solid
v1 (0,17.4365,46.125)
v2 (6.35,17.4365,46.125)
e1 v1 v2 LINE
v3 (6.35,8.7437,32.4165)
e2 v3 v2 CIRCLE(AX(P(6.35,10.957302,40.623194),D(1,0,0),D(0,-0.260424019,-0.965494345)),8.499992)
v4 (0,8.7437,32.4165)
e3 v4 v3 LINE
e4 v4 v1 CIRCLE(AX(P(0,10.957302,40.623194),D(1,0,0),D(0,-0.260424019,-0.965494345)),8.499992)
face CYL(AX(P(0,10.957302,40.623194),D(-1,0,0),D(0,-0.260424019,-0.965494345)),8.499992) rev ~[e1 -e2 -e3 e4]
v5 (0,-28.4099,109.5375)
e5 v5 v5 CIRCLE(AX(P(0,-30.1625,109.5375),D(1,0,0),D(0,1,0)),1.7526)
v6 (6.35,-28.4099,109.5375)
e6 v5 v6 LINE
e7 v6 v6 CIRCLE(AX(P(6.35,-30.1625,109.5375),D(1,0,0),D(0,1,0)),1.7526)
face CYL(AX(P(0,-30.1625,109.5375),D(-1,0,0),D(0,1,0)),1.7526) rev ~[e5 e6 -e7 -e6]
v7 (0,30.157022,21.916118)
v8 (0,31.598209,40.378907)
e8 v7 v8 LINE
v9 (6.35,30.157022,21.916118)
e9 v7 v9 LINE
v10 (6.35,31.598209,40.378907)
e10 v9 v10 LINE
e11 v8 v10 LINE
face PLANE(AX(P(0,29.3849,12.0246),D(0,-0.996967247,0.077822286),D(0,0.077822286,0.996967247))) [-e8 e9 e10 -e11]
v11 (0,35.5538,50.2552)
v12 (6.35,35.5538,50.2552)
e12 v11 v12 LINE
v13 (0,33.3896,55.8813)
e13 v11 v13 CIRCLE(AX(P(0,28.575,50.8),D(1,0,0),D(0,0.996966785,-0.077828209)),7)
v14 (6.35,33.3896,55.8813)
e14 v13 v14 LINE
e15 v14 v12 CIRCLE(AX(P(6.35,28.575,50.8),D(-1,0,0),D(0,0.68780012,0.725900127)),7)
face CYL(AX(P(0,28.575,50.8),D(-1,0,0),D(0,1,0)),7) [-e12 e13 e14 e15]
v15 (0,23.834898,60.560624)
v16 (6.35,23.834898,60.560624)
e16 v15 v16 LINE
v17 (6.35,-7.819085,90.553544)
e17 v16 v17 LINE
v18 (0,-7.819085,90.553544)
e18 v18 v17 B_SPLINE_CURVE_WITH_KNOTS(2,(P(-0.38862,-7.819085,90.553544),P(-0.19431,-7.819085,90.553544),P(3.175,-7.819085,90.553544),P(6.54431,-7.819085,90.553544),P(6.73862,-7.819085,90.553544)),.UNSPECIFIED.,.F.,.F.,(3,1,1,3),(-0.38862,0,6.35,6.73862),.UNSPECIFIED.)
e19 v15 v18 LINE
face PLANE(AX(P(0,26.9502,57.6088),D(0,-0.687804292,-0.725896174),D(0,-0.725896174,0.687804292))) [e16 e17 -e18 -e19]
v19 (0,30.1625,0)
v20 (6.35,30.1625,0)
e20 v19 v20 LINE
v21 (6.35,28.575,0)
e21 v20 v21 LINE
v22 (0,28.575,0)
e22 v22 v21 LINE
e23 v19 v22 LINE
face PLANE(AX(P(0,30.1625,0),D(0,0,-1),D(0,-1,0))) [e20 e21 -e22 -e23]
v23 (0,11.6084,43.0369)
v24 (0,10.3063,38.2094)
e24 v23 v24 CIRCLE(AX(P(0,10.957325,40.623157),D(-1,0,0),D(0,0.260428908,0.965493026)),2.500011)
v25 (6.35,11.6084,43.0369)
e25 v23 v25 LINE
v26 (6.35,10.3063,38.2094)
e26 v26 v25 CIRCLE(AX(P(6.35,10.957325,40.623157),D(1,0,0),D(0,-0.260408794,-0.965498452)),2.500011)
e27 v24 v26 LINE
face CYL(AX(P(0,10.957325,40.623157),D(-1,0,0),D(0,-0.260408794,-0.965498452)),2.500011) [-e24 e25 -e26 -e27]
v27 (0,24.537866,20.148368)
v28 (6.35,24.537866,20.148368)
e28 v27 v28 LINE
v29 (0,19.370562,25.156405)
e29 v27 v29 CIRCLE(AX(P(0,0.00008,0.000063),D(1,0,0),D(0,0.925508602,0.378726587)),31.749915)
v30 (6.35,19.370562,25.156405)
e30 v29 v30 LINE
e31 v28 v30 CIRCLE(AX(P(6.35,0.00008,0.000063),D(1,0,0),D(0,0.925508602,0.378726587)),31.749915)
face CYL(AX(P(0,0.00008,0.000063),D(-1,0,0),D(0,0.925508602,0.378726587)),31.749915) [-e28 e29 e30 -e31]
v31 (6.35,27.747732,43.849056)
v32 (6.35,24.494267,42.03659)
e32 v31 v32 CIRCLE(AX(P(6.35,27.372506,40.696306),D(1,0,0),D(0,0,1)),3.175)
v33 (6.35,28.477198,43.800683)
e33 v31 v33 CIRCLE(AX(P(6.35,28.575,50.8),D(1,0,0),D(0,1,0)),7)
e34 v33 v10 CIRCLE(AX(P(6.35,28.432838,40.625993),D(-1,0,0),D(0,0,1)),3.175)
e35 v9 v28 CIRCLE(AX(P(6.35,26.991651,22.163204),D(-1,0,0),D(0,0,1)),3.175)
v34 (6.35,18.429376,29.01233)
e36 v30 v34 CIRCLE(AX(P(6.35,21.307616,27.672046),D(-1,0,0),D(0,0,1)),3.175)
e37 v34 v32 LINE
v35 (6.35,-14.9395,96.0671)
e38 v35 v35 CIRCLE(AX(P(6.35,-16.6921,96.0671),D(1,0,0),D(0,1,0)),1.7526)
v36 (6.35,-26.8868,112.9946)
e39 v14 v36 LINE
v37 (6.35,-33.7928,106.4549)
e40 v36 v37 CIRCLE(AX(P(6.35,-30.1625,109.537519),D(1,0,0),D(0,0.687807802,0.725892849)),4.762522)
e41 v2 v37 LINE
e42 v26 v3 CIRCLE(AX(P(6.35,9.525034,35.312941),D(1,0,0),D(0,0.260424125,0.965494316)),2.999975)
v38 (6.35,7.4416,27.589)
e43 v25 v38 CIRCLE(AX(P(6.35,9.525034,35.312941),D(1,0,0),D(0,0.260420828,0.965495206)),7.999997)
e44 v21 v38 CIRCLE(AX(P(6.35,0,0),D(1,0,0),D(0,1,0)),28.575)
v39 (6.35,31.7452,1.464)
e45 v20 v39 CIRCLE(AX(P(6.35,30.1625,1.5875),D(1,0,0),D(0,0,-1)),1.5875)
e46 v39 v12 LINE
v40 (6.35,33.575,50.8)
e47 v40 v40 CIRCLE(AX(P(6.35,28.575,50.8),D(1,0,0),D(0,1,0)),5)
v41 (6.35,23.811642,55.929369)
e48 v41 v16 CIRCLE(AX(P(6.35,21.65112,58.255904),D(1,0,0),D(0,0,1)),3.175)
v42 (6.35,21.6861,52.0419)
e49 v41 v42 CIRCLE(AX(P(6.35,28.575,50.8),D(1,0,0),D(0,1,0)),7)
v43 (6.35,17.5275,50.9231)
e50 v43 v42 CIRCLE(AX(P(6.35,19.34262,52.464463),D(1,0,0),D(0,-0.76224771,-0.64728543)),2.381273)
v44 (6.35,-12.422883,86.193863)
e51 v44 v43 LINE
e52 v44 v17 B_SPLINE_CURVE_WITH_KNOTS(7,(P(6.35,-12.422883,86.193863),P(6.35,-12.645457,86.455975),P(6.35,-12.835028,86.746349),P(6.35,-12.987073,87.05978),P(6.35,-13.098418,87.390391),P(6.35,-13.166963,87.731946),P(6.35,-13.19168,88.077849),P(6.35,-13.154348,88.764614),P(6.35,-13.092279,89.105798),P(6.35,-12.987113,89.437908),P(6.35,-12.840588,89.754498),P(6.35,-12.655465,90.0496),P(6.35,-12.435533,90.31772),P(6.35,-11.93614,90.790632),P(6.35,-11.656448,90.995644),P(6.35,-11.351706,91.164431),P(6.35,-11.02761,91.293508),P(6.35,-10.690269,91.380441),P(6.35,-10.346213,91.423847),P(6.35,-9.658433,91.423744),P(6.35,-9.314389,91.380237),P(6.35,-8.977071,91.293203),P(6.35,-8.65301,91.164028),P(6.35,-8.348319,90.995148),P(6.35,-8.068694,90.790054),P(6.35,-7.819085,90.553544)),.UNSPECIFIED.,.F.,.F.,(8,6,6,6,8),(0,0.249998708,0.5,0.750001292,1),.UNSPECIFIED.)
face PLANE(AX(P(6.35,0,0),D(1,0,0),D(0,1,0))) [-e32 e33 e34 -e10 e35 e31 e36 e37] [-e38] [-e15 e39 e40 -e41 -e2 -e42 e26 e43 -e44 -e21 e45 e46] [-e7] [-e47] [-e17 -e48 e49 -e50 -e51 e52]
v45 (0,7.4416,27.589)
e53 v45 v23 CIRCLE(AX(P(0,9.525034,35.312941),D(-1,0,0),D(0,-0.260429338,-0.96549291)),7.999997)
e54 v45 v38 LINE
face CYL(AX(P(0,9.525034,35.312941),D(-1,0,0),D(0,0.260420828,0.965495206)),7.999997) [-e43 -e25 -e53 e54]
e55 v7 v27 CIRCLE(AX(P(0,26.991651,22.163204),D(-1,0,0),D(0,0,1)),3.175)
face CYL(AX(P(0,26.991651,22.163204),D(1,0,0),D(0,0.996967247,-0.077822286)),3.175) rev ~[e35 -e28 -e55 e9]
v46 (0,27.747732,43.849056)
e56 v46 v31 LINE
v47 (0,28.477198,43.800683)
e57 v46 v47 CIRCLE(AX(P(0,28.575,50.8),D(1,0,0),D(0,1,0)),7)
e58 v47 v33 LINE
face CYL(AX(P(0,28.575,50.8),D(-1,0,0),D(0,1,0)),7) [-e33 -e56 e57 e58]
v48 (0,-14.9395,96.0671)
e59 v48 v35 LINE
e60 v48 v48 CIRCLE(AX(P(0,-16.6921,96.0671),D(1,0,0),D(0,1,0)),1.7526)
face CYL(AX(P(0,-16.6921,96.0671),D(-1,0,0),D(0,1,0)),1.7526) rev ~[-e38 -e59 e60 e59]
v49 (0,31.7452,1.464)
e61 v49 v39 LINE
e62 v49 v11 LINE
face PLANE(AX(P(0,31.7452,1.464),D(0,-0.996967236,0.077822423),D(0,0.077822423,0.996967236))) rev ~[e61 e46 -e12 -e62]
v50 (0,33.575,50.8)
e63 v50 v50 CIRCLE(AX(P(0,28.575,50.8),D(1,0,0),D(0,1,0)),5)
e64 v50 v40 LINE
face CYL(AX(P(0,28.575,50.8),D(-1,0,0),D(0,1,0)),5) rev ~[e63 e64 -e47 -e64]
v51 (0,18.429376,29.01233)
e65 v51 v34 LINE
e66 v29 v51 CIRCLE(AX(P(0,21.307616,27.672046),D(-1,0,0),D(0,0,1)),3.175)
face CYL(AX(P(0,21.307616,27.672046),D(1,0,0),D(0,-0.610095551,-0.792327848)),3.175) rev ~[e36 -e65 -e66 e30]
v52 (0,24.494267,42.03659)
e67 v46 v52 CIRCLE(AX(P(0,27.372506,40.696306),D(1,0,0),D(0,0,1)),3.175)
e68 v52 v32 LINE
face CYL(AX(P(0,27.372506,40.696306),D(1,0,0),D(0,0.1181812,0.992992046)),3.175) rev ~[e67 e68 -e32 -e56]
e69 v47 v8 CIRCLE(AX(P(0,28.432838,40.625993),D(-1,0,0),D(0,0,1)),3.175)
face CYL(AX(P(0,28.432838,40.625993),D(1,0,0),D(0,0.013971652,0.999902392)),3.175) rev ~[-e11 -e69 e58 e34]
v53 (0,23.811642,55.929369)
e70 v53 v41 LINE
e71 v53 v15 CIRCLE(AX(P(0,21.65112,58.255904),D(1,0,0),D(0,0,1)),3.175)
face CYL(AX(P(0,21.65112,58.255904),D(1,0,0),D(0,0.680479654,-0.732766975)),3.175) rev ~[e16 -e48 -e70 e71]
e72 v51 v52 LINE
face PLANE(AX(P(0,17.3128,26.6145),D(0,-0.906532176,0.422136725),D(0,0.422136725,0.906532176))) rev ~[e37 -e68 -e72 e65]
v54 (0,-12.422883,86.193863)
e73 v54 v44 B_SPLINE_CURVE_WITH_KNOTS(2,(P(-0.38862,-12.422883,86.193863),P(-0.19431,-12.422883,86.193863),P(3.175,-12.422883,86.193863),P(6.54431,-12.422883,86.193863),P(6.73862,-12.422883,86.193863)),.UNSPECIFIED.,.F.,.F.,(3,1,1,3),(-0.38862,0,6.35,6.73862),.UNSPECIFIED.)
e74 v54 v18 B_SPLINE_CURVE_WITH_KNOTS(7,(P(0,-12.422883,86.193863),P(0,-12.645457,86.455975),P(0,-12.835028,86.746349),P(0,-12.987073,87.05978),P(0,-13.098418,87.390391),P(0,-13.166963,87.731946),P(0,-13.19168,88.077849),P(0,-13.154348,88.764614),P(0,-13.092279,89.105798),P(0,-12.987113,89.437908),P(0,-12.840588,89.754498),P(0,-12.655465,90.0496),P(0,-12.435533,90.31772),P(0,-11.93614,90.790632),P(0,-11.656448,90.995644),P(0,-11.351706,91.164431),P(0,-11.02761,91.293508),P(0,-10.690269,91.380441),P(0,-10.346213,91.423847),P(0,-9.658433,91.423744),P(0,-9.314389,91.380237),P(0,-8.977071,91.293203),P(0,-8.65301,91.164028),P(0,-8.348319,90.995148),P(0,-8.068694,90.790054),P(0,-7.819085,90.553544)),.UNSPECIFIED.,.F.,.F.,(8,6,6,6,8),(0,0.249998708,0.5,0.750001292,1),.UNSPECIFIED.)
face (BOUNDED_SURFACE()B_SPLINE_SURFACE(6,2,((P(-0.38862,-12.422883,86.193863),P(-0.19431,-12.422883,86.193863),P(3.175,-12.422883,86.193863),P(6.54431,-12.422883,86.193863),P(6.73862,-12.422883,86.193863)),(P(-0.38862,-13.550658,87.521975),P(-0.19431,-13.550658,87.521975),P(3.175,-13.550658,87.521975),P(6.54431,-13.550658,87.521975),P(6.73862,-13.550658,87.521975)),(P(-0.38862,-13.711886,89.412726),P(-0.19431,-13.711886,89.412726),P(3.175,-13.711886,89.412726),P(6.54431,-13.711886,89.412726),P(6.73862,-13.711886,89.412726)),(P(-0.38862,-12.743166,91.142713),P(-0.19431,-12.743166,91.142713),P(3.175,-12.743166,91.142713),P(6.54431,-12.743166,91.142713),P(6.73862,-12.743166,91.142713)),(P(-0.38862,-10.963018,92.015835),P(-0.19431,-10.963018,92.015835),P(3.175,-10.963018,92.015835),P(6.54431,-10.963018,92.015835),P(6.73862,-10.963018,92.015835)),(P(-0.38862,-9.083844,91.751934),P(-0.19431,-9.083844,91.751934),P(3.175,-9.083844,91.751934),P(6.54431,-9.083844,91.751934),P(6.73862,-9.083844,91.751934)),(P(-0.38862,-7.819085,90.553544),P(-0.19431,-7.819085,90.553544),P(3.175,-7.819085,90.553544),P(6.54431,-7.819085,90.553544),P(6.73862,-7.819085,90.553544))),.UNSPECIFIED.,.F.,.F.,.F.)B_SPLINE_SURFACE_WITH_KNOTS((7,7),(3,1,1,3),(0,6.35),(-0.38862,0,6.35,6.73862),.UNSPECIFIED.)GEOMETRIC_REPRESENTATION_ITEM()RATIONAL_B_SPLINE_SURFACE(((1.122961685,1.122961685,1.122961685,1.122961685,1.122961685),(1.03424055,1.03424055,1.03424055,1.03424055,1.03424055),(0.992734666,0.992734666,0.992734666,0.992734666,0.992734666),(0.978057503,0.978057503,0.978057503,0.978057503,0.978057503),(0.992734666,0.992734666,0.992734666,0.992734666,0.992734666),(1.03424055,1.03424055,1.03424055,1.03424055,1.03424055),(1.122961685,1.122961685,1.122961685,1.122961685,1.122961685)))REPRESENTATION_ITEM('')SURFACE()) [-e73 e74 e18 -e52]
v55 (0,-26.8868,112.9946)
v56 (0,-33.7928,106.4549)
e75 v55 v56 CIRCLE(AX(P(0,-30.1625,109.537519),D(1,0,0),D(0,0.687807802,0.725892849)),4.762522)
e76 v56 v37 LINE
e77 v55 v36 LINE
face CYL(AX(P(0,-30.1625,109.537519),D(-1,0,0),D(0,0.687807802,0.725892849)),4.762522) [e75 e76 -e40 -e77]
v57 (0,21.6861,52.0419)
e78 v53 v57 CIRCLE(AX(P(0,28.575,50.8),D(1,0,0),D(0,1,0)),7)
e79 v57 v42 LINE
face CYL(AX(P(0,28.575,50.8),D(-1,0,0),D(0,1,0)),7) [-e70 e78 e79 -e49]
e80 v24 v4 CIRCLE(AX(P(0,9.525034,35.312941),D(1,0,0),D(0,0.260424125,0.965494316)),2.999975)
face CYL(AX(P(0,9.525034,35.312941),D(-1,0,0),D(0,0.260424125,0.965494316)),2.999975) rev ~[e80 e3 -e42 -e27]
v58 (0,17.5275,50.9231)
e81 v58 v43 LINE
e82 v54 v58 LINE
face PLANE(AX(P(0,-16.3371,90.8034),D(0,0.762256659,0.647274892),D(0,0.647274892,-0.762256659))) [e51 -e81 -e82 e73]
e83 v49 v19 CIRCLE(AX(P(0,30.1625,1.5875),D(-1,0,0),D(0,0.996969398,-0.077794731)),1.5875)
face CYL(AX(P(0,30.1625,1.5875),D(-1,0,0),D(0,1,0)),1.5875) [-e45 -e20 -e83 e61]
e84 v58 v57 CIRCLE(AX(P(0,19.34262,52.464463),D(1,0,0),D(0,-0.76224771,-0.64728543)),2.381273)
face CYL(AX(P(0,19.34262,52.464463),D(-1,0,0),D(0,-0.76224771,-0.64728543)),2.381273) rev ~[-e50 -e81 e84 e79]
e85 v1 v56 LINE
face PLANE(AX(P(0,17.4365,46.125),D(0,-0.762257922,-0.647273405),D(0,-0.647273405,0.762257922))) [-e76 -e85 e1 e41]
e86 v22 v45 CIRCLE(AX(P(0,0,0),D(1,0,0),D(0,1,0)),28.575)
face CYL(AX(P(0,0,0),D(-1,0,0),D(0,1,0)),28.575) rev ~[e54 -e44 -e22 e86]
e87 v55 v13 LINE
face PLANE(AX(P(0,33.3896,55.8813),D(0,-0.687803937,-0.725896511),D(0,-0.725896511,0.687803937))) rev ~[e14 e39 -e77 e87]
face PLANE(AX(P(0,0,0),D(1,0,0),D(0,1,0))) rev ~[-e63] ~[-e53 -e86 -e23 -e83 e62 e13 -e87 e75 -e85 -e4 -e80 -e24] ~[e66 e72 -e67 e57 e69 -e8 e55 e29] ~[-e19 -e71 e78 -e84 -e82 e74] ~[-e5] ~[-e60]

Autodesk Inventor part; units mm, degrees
ref_plane "YZ Plane" through (0, 0, 0) normal (1, 0, 0) x (0, 1, 0)
ref_plane "XZ Plane" through (0, 0, 0) normal (0, 1, 0) x (-1, 0, 0)
ref_plane "XY Plane" through (0, 0, 0) normal (0, 0, 1) x (1, 0, 0)
sketch "Sketch1" plane through (0, 0, 0) normal (1, 0, 0) x (0, 1, 0)
  circle A0 centre (28.575, 50.8) radius 7
  circle A1 centre (0, 0) radius 28.575
  line L0 (0, 0) -> (28.575, 50.8) construction
  line L1 (28.575, 0) -> (-28.575, 0)
  arc A2 (13.9234, 2.1588) -> (28.575, 0) centre (28.575, 50.8) ccw construction
  line L2 (28.575, 0) -> (28.575, 43.8) construction
  circle A3 centre (28.575, 50.8) radius 5
  circle A4 centre (30.1625, 1.5875) radius 1.5875
  line L3 (30.1625, 0) -> (28.575, 0)
  line L4 (31.7452, 1.464) -> (35.5538, 50.2552)
  circle A5 centre (-28.575, 87.3125) radius 3 construction
  line L5 (23.4933, 45.9858) -> (-33.7928, 106.4549) construction
  line L6 (33.3896, 55.8813) -> (-26.8868, 112.9946)
  arc A6 (10.9573, 40.6232) -> (8.0927, 30.0027) centre (9.525, 35.313) ccw construction
  arc A7 (11.6084, 43.0369) -> (7.4416, 27.589) centre (9.525, 35.313) ccw
  arc A8 (10.3063, 38.2094) -> (8.7437, 32.4165) centre (9.525, 35.313) ccw
  arc A9 (10.3063, 38.2094) -> (11.6084, 43.0369) centre (10.9573, 40.6232) ccw
  arc A10 (7.4416, 27.589) -> (8.7437, 32.4165) centre (8.0927, 30.0027) ccw construction
  arc A11 (9.525, 35.313) -> (15.1497, 44.1832) centre (10.9573, 40.6232) ccw construction
  arc A12 (8.7437, 32.4165) -> (17.4365, 46.125) centre (10.9573, 40.6232) ccw
  arc A13 (10.3063, 38.2094) -> (12.863, 42.2414) centre (10.9573, 40.6232) ccw
  arc A14 (10.3063, 38.2094) -> (8.7437, 32.4165) centre (9.525, 35.313) ccw
  arc A15 (17.4365, 46.125) -> (12.863, 42.2414) centre (15.1497, 44.1832) ccw construction
  line L7 (17.4365, 46.125) -> (-33.7928, 106.4549)
  line L8 (9.525, 35.313) -> (-28.575, 87.3125) construction
  arc A16 (-26.8868, 112.9946) -> (-33.7928, 106.4549) centre (-30.1625, 109.5375) ccw
  line L9 (-25.4, 109.5375) -> (-34.925, 109.5375) construction
  circle A17 centre (-30.1625, 109.5375) radius 1.7526
  line L10 (28.575, 50.8) -> (-30.1625, 109.5375) construction
  circle A18 centre (-16.6921, 96.0671) radius 1.7526
  circle A19 centre (-16.6921, 96.0671) radius 5.2756
  line L11 (26.9502, 57.6088) -> (-11.7344, 94.2634)
  line L12 (-16.3371, 90.8034) -> (17.5275, 50.9231)
  arc A20 (17.5275, 50.9231) -> (21.6861, 52.0419) centre (19.3426, 52.4644) ccw
  line L13 (29.3849, 12.0246) -> (31.9322, 44.6576)
  arc A21 (29.3849, 12.0246) -> (2.4085, 31.6585) centre (0, 0) ccw
  arc A22 (31.7234, 1.2983) -> (31.6845, 2.0389) centre (0, 0) ccw
  line L14 (17.3128, 26.6145) -> (25.6201, 44.4543)
  circle A23 centre (20.102, 36.3649) radius 1.5875 construction
  line L15 (10.9573, 40.6232) -> (20.102, 36.3649) construction
  point P0 (-20.3953, 106.8437)
  point P1 (8.7437, 32.4165)
  point P2 (7.4416, 27.589)
  point P3 (12.863, 42.2414)
  dimension "d0" = 14
  dimension "d1" = 57.15
  dimension "d3" = 50.8
  dimension "d4" = 10
  dimension "d5" = 3.175
  dimension "d6" = 6
  dimension "d13" = 2.5
  dimension "d15" = 19.05
  dimension "d21" = 3
  dimension "d25" = 57.15
  dimension "d30" = 9.525
  dimension "d33" = 63.5
  dimension "d34" = 22.225
  dimension "d35" = 64.4637
  dimension "d36" = 3.5052
  dimension "d37" = 45
  dimension "d40" = 19.05
  dimension "d45" = 3.175
  dimension "d46" = 3.175
  dimension "d47" = 4.7625
  dimension "d48" = 3.175
  dimension "d50" = 3.175
  dimension "d51" = 3.175
extrude "Extrusion1" add sketch "Sketch1" along normal blind 6.35 contours A0 | A0 L11 A19 L6 | L4 A4 L3 A1 A7 A21 L13 A0 | A19 L12 A20 A0 L14 A21 A7 A9 A8 A12 L7 A16 L6 | A19 | A4 A22 | A4 A22
fillet "Fillet2" radius 3.175 7 edges at (3.175, 29.3849, 12.0246) (3.175, 17.3128, 26.6145) (3.175, 31.9322, 44.6576) (3.175, 26.9502, 57.6088) (3.175, -11.7344, 94.2634) (3.175, -16.3371, 90.8034) (3.175, 25.6201, 44.4543)
properties part number "Arm" material "Aluminum 6061"
